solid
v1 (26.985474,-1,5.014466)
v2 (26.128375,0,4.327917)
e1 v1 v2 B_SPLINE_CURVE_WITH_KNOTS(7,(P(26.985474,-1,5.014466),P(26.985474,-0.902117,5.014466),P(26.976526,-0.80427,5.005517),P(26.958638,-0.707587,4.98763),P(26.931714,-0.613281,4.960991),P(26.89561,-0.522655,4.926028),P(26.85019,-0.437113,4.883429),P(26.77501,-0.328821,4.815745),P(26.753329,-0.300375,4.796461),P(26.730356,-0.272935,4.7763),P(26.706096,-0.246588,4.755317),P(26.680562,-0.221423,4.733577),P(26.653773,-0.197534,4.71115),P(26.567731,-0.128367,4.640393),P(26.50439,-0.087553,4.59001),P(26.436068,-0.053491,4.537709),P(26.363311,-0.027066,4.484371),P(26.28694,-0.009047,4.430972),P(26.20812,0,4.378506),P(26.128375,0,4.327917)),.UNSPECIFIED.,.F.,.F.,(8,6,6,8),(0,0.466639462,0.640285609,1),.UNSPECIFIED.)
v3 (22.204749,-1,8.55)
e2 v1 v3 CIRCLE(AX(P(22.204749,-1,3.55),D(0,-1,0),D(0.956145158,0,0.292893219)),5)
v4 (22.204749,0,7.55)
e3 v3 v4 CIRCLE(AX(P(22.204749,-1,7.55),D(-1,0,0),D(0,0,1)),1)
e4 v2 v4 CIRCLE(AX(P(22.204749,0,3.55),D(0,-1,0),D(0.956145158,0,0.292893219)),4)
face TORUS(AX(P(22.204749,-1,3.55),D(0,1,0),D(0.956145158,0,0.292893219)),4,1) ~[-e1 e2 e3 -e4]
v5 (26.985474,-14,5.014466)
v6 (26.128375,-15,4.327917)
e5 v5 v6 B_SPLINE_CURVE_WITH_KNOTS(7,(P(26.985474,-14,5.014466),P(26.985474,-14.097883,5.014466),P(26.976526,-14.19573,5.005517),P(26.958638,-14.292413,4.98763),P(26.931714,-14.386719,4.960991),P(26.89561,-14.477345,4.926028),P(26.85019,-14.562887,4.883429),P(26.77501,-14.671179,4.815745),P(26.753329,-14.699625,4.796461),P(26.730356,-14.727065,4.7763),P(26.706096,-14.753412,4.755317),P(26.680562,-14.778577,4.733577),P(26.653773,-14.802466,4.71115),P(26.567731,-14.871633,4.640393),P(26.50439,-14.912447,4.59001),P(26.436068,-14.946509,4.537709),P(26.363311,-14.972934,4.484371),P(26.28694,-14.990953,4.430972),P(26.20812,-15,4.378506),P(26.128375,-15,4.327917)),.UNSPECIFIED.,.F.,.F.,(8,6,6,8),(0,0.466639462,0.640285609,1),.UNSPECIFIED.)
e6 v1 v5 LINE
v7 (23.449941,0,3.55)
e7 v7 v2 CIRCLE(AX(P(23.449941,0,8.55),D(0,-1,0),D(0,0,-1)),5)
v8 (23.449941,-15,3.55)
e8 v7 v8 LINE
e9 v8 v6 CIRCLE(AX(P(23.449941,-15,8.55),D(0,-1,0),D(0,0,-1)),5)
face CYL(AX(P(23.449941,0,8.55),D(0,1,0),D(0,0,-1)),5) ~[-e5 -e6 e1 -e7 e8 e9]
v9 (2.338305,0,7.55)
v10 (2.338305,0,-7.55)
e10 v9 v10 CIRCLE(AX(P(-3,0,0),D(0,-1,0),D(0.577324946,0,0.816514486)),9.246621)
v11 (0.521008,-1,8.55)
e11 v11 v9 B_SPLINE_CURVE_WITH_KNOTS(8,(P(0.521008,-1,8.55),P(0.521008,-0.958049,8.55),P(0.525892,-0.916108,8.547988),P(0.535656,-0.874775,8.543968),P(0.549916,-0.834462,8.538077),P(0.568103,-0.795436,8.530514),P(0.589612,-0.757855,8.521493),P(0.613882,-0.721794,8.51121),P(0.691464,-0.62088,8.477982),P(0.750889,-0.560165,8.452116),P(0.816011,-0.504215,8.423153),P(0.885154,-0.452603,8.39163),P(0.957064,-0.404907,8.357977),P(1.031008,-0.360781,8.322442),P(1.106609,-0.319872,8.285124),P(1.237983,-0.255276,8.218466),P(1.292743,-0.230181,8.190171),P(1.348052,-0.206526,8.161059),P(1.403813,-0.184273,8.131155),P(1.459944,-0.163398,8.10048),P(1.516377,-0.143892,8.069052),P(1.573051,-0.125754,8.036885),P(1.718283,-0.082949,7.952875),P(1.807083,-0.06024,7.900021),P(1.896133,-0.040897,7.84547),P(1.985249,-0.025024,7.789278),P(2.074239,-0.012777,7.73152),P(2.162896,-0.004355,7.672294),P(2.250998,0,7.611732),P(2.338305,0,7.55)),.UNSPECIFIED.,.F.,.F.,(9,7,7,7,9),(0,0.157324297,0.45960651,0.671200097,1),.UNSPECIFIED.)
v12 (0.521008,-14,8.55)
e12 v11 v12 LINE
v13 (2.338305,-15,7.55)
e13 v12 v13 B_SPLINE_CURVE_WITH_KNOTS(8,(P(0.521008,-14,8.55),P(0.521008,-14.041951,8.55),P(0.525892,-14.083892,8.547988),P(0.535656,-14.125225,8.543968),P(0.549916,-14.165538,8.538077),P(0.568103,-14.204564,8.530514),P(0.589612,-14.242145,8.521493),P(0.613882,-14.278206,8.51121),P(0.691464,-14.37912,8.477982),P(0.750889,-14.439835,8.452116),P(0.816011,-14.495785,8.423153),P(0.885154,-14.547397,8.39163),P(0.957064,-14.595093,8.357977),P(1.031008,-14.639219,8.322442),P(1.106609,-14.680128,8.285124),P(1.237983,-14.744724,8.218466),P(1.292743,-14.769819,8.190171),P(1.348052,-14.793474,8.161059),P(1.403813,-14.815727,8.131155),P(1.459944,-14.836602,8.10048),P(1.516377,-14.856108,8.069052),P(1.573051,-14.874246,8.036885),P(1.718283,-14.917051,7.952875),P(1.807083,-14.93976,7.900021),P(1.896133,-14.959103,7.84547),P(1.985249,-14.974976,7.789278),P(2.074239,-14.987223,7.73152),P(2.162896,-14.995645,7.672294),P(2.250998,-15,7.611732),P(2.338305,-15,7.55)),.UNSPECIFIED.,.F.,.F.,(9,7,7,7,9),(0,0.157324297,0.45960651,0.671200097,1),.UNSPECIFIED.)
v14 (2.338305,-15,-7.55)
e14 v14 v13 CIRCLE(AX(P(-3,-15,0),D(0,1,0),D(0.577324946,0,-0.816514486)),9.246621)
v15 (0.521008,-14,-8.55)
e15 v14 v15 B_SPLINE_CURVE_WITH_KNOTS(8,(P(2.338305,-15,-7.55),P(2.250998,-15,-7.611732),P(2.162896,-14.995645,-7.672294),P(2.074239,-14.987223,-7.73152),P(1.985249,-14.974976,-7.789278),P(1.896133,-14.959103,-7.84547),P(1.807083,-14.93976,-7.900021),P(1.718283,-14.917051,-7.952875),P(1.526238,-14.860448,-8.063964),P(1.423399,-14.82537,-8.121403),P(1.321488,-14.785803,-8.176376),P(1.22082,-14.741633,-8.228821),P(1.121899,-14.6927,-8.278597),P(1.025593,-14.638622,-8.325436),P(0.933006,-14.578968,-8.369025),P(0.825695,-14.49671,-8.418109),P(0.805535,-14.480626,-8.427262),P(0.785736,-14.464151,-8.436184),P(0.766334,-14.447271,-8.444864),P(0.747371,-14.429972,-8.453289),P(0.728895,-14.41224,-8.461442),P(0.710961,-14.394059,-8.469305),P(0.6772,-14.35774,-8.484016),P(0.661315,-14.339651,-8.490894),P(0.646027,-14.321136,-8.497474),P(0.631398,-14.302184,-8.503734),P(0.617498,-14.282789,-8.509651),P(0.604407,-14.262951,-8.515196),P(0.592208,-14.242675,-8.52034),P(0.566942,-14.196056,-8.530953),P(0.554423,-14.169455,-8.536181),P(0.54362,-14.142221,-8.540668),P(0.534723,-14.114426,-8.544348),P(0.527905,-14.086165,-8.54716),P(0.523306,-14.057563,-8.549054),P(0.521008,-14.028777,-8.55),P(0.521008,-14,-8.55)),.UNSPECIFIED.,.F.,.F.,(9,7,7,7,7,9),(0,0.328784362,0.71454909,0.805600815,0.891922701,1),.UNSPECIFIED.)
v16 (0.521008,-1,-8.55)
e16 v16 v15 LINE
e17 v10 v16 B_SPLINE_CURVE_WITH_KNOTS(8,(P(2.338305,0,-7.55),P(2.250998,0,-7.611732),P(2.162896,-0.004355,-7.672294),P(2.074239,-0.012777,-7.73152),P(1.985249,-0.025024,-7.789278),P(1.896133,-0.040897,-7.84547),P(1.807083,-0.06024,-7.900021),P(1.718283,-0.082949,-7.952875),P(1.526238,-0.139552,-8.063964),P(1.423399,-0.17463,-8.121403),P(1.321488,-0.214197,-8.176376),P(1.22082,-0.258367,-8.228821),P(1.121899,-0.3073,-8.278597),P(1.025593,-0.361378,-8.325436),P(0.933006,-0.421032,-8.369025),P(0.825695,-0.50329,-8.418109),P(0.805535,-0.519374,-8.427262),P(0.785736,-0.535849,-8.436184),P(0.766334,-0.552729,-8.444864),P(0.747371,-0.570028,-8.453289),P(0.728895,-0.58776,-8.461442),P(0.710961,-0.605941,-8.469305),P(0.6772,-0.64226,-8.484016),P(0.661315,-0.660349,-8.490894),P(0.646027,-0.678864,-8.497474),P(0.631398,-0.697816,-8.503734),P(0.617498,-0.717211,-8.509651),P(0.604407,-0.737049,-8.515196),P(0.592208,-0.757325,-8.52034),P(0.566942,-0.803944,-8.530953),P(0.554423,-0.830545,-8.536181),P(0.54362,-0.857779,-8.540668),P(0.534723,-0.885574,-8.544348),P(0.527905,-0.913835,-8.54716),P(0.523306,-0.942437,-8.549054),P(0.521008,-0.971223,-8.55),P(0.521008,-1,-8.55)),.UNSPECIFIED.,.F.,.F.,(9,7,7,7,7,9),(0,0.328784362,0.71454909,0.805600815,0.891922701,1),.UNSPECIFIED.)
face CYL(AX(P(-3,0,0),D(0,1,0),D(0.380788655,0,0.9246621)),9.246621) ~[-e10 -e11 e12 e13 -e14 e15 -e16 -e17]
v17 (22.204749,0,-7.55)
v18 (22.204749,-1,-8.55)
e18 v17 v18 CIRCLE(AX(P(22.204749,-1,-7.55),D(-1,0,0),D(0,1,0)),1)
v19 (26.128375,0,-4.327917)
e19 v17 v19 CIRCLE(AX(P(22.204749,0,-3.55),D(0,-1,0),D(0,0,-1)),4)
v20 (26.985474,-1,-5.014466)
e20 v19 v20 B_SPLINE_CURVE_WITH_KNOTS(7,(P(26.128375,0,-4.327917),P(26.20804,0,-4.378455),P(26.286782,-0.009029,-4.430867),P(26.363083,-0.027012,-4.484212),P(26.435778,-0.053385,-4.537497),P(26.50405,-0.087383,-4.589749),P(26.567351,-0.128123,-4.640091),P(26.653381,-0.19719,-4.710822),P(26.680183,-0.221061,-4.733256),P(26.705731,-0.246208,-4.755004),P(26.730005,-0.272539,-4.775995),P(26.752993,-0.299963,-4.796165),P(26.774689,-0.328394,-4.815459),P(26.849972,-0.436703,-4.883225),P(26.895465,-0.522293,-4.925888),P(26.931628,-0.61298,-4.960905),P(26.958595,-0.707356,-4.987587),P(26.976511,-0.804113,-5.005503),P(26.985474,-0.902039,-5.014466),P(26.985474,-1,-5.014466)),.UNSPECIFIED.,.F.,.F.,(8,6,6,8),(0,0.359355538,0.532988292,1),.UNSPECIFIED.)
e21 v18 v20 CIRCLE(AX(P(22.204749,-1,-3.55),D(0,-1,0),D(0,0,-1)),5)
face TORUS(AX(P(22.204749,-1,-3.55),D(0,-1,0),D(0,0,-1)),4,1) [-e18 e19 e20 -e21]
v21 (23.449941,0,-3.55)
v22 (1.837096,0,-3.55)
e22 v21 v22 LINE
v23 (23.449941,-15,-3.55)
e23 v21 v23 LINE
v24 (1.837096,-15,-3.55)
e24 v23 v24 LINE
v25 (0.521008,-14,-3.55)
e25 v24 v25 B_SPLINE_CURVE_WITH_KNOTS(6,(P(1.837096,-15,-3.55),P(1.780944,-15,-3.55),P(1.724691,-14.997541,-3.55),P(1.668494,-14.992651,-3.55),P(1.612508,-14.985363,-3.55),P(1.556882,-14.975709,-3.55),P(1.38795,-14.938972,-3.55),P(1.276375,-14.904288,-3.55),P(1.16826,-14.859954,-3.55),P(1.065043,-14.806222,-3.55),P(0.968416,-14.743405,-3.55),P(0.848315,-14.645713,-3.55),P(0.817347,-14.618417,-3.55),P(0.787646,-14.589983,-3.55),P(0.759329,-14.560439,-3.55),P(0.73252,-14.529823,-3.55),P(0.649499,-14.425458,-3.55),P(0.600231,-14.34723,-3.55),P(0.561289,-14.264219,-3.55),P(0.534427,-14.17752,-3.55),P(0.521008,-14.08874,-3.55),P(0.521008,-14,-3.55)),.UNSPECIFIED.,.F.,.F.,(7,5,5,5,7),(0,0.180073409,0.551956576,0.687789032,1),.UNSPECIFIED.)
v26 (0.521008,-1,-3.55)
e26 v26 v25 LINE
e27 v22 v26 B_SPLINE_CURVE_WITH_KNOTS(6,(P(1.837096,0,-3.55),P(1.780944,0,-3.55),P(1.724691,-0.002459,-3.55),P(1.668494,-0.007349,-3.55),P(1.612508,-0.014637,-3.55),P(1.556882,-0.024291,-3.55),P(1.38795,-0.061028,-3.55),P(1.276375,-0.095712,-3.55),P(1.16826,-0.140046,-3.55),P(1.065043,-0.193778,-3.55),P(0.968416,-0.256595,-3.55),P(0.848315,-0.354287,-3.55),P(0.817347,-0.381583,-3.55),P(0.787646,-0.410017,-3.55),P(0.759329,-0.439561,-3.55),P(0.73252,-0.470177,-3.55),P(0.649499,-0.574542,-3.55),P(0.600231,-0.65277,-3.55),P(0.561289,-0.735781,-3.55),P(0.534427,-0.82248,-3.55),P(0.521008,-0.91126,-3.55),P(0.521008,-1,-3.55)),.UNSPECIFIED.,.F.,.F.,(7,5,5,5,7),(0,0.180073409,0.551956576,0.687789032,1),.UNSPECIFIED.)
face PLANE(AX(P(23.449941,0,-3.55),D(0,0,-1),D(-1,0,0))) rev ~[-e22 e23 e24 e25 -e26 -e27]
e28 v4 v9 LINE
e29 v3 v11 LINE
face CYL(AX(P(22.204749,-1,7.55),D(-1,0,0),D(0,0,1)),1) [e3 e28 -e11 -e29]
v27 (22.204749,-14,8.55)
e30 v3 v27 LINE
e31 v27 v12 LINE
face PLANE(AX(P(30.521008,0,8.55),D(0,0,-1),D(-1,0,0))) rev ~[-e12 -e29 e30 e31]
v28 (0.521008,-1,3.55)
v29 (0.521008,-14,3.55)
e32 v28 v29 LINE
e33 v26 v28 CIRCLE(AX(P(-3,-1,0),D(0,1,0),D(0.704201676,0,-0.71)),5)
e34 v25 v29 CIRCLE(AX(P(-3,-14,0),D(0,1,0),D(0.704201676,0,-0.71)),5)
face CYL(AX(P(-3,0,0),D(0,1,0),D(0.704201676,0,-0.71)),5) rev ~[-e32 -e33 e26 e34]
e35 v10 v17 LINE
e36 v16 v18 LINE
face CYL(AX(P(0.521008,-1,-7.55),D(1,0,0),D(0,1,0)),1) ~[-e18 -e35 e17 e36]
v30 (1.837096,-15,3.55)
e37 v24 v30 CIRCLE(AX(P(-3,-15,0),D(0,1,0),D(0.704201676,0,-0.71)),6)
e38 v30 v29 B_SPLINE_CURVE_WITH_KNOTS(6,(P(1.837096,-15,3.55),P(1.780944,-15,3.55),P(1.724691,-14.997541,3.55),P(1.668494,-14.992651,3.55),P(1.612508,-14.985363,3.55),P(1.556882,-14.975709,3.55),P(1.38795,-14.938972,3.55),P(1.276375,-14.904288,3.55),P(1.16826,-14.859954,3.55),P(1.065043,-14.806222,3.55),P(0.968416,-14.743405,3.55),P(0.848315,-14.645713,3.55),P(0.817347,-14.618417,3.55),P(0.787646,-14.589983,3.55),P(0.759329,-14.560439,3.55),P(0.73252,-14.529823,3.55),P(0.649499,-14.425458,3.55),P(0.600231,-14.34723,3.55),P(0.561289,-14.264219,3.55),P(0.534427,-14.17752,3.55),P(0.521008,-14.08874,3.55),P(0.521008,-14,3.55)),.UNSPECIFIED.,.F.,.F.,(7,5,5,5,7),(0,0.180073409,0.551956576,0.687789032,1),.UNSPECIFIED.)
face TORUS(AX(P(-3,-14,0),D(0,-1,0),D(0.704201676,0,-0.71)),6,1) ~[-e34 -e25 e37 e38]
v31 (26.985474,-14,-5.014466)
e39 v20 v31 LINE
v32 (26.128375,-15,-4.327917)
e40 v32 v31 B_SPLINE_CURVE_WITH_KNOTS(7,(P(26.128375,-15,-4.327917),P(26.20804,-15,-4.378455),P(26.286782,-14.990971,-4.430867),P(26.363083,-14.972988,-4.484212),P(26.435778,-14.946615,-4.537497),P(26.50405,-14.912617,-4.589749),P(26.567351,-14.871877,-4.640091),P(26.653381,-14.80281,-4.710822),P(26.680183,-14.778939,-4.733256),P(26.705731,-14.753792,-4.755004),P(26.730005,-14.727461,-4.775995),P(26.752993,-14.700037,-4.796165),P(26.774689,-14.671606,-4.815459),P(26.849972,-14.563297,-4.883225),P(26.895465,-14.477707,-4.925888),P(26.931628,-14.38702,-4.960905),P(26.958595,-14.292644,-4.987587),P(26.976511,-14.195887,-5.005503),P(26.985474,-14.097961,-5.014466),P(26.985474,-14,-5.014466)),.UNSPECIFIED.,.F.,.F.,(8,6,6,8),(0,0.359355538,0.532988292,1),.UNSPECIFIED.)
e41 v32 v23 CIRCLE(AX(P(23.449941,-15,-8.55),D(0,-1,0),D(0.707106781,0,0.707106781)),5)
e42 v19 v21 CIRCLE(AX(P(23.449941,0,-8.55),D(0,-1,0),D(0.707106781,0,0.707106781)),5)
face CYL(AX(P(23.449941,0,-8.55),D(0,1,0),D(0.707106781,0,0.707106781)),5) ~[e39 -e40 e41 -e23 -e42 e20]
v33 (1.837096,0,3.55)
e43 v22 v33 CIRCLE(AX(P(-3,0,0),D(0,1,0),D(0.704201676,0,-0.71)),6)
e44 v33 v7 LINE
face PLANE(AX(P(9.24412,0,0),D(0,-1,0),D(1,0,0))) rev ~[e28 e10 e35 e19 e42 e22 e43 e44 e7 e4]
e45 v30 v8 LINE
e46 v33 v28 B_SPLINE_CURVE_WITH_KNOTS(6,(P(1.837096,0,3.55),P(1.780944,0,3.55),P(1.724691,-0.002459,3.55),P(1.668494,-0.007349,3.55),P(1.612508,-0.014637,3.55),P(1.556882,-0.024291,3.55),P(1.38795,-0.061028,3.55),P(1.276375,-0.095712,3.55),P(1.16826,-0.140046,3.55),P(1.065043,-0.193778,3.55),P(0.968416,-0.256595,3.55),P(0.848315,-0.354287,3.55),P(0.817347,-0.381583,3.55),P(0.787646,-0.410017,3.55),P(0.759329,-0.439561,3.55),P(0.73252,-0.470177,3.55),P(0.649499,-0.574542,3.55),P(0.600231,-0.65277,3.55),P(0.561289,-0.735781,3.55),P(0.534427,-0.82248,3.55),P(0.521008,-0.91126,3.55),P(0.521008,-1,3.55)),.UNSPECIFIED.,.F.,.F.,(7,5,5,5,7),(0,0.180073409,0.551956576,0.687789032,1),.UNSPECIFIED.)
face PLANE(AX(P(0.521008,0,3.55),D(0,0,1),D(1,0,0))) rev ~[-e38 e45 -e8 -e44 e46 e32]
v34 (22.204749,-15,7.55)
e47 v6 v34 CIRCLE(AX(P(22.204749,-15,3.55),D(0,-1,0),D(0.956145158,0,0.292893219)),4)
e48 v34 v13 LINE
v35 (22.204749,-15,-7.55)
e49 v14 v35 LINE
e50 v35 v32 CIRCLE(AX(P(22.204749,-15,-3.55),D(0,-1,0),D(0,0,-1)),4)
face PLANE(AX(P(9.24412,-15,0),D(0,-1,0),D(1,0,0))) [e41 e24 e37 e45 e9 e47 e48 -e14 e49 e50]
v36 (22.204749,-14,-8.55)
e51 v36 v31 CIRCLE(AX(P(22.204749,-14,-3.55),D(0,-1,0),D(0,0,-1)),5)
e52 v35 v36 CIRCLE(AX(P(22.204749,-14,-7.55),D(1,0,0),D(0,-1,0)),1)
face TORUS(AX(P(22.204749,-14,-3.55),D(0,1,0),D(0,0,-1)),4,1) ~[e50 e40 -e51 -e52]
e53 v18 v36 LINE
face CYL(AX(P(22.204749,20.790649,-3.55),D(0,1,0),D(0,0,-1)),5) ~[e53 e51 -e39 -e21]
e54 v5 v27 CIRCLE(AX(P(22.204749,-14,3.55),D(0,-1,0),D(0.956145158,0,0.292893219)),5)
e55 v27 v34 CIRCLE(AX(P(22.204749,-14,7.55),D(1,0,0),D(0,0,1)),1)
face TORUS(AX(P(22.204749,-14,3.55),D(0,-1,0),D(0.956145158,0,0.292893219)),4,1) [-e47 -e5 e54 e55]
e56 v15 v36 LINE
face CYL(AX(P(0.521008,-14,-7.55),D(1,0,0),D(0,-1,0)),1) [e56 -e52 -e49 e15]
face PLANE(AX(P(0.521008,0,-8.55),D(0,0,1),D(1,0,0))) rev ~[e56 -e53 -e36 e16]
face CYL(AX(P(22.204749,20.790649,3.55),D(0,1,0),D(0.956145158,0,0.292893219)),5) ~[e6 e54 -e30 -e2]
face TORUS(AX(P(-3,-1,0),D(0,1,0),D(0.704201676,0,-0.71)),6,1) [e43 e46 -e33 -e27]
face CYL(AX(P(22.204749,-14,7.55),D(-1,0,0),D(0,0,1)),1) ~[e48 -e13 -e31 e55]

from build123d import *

# Parameters (mm, degrees)
F1_DEPTH    = 15
F2_T1_DEPTH = 56.5812984693
F3_R        = 1


# Not quite as in the source:
# - a fillet or chamfer that OpenCascade refuses, or shapes differently, is made with other operations: its cross-section is extruded or revolved along the edge and cut away or added


with BuildPart() as f1:
    # F0 (on Front) → F1 (new body)
    with BuildSketch(Plane.XZ):
        with BuildLine():
            Line((30.5210083783, 8.55), (0.5210083783, 8.55))
            ThreePointArc((0.5210083783, 8.55), (-12.2466210045, 0), (0.5210083783, -8.55))
            Line((0.5210083783, -8.55), (30.5210083783, -8.55))
            Line((30.5210083783, -8.55), (26.9854744724, -5.0144660941))
            ThreePointArc((26.9854744724, -5.0144660941), (25.3633577283, -3.9306023374), (23.4499405664, -3.55))
            Line((23.4499405664, -3.55), (0.5210083783, -3.55))
            ThreePointArc((0.5210083783, -3.55), (-8, 0), (0.5210083783, 3.55))
            Line((0.5210083783, 3.55), (23.4499405664, 3.55))
            ThreePointArc((23.4499405664, 3.55), (25.3633577283, 3.9306023374), (26.9854744724, 5.0144660941))
            Line((26.9854744724, 5.0144660941), (30.5210083783, 8.55))
        make_face()
    extrude(amount=F1_DEPTH)

    # F2: fillet of radius 5 on 2 edges, made by hand

    # F2_s2 → F2_t1 (cut)
    with BuildSketch(Plane.XZ.offset(-20.7906492346)):
        with BuildLine():
            ThreePointArc((22.2047486844, -8.55), (25.1777664719, -7.5700951774), (26.9854744724, -5.0144660941))
            Line((26.9854744724, -5.0144660941), (30.5210083783, -8.55))
            Line((30.5210083783, -8.55), (22.2047486844, -8.55))
        make_face()
        with BuildLine():
            ThreePointArc((26.9854744724, 5.0144660941), (25.1777664719, 7.5700951774), (22.2047486844, 8.55))
            Line((22.2047486844, 8.55), (30.5210083783, 8.55))
            Line((30.5210083783, 8.55), (26.9854744724, 5.0144660941))
        make_face()
    extrude(amount=F2_T1_DEPTH, mode=Mode.SUBTRACT)

    # F3
    f3_edges = [f1.edges().sort_by_distance(p)[0] for p in [
        (11.362879, 0, -8.55),
        (11.362879, -15, -8.55),
        (11.362879, -15, 8.55),
        (11.362879, 0, 8.55),
        (-8, -15, 0),
        (-8, 0, 0),
        (25.177766, 0, 7.570095),
        (25.177766, -15, 7.570095),
        (25.177766, 0, -7.570095),
        (25.177766, -15, -7.570095),
    ]]
    fillet(f3_edges, radius=F3_R)


solid = f1.part
